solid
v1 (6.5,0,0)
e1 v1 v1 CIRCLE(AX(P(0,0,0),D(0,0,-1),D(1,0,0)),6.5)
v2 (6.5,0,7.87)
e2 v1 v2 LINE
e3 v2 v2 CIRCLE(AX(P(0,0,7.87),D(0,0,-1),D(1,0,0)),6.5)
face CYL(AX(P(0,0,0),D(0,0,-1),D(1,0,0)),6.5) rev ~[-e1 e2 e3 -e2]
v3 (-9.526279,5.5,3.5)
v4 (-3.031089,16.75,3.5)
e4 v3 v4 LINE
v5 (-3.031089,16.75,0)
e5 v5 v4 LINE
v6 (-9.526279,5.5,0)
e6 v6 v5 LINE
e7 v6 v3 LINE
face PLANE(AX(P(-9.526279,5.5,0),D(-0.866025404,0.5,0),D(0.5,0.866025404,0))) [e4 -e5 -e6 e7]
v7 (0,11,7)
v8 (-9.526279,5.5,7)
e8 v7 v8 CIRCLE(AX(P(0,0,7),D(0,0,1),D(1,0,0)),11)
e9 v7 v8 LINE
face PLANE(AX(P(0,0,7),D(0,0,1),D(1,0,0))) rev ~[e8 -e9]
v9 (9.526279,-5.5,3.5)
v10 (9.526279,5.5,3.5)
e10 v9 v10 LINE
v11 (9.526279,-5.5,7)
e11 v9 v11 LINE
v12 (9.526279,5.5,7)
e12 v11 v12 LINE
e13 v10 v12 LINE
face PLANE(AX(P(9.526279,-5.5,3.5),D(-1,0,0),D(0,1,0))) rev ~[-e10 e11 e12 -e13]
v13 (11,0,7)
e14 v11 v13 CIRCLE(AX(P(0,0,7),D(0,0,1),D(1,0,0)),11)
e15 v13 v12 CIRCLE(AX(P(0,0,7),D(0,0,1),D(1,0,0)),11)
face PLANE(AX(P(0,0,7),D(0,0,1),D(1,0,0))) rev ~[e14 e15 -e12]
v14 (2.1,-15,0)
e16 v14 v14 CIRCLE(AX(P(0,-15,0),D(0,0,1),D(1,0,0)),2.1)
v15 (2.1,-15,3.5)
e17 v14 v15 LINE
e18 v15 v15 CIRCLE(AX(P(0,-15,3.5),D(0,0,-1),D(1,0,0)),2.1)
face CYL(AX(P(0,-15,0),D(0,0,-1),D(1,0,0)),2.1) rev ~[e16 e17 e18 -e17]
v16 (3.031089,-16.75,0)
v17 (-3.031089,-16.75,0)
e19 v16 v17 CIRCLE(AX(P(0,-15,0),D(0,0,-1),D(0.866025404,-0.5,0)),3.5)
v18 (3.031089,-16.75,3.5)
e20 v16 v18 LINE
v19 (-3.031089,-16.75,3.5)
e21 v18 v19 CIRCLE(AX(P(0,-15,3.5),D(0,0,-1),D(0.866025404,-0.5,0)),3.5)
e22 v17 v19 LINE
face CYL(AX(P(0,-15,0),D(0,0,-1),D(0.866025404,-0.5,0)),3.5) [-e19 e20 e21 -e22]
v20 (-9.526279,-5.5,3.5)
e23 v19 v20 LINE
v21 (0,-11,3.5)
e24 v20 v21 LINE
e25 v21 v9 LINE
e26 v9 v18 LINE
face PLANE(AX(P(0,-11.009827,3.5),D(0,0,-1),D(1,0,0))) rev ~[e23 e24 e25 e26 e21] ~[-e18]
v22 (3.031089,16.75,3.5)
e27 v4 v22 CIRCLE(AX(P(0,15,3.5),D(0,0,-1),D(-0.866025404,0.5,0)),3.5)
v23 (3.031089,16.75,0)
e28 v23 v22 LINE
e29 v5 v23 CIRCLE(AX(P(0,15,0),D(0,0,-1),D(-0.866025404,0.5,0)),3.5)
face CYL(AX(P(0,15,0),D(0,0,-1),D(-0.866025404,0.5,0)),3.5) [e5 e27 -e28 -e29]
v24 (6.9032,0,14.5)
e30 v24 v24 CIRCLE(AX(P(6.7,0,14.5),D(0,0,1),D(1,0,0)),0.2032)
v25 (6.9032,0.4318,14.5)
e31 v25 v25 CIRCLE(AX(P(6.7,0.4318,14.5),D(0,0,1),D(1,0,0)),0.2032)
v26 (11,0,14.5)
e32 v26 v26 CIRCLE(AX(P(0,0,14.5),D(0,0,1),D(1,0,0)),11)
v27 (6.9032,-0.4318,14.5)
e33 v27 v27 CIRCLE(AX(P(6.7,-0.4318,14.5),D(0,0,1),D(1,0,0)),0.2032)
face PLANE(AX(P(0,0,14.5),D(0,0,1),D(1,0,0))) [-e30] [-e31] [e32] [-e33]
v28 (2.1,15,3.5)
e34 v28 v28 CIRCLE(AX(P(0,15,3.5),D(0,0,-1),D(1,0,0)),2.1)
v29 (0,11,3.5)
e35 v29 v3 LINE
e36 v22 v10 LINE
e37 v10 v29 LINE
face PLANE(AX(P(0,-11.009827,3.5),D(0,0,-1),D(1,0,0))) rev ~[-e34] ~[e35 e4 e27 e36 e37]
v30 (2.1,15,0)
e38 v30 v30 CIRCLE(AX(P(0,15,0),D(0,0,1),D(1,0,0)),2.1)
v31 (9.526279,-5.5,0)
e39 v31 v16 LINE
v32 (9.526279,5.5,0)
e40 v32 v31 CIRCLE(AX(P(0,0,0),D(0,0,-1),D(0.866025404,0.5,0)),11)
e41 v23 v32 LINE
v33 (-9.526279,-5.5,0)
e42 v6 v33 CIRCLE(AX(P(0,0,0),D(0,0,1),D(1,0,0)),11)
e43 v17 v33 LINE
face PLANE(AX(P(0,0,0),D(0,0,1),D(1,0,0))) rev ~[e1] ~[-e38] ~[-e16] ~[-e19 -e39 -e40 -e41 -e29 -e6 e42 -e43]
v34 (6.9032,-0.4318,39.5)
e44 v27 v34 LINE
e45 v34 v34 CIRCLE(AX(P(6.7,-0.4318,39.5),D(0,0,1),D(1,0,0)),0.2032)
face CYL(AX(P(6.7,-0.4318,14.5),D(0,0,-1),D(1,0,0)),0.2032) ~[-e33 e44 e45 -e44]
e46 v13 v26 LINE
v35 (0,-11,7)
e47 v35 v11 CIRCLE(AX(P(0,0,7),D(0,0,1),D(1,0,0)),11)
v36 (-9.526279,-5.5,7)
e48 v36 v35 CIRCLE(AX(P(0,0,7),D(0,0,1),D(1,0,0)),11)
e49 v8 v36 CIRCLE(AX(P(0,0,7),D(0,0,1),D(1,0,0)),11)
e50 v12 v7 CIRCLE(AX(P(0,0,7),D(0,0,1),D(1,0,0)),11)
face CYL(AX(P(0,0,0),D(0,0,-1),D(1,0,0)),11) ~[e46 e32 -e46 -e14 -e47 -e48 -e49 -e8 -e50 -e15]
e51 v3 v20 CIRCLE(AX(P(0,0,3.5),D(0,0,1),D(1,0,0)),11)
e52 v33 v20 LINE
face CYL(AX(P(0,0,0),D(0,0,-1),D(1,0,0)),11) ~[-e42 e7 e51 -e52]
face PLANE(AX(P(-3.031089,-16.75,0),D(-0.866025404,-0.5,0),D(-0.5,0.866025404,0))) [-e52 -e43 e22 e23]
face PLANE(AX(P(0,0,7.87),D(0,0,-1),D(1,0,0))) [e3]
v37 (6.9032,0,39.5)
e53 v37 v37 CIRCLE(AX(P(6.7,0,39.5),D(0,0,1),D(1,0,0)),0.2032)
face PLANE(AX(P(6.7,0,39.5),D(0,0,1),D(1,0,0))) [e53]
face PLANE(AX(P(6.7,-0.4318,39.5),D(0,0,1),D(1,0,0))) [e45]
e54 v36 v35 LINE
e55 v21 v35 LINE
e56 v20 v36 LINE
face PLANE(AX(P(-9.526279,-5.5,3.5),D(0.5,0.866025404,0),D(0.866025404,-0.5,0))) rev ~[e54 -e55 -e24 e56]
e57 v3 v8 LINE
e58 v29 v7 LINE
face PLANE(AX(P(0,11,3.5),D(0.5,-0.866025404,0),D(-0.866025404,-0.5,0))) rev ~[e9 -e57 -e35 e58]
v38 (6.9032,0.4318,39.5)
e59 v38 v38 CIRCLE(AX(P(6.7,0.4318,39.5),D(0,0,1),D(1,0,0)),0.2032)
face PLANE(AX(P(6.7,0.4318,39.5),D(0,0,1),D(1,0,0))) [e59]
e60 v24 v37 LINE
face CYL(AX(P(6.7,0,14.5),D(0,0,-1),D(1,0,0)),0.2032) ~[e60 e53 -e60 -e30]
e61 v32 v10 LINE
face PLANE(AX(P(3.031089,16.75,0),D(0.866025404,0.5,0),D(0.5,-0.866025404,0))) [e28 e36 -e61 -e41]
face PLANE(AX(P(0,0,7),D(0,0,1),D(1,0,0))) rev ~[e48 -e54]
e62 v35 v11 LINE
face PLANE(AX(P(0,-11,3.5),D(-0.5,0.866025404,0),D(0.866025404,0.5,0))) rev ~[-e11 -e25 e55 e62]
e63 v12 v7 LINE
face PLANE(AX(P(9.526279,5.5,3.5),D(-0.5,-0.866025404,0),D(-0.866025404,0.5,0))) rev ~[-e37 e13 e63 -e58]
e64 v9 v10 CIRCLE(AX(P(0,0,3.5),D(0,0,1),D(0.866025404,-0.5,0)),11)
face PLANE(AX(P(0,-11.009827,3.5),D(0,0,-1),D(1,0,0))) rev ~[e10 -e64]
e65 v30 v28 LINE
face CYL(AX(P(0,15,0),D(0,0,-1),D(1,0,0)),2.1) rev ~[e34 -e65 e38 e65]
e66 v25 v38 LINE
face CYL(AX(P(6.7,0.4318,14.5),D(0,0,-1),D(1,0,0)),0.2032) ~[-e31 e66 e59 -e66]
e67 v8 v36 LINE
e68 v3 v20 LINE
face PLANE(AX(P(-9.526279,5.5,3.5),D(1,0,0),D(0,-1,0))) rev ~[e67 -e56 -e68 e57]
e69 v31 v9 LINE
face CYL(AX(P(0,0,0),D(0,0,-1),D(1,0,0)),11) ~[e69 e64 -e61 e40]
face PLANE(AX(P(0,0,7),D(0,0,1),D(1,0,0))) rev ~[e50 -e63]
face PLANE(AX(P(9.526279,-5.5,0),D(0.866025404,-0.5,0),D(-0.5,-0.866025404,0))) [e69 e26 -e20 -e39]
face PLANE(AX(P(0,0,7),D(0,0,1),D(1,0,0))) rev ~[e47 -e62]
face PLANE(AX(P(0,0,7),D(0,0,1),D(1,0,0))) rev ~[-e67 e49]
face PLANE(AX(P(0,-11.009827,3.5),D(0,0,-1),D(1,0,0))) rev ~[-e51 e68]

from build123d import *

# Parameters (mm, degrees)
F0_R      = 11
F1_DEPTH  = 14.5
F2_R      = 2.1
F3_DEPTH  = 3.5
F4_R      = 11
F5_DEPTH  = 3.5
F7_DEPTH  = 3.5
F8_R      = 6.5
F9_DEPTH  = 7.87
F10_R     = 0.2032
F11_DEPTH = 25


# Not quite as in the source:
# - a pattern or mirror of a feature is missing from the dataset's text; its kind, count and spacing are read off the source's solid


with BuildPart() as f1:
    # F0 (on Top) → F1 (new body)
    with BuildSketch(Plane.XY):
        Circle(F0_R)
    extrude(amount=F1_DEPTH)

    # F2 (on face) → F3 (join)
    with BuildSketch(Plane(origin=(0, 0, 0), x_dir=(1, 0, 0), z_dir=(0, 0, -1))):
        with BuildLine():
            Line((9.5262794416, 5.5), (3.0310889132, 16.75))
            ThreePointArc((3.0310889132, 16.75), (0, 18.5), (-3.0310889132, 16.75))
            Line((-3.0310889132, 16.75), (-9.5262794416, 5.5))
            ThreePointArc((-9.5262794416, 5.5), (0, 11), (9.5262794416, 5.5))
        make_face()
        with Locations((0, 15)):
            Circle(F2_R, mode=Mode.SUBTRACT)
        with BuildLine():
            ThreePointArc((9.5262794416, -5.5), (0, -11), (-9.5262794416, -5.5))
            Line((-9.5262794416, -5.5), (-3.0310889132, -16.75))
            ThreePointArc((-3.0310889132, -16.75), (0, -18.5), (3.0310889132, -16.75))
            Line((3.0310889132, -16.75), (9.5262794416, -5.5))
        make_face()
        with Locations((0, -15)):
            Circle(F2_R, mode=Mode.SUBTRACT)
    f3 = extrude(amount=-F3_DEPTH)

    # F3_copies: F3 across plane
    add(f3.mirror(Plane(origin=(0, 0, 0), x_dir=(0, 0, -1), z_dir=(-1, 0, 0))))

    # F4 (on face) → F5 (cut)
    with BuildSketch(Plane.XY.offset(3.5)):
        Circle(F4_R)
    extrude(amount=F5_DEPTH, mode=Mode.SUBTRACT)

    # F6 (on face) → F7 (join)
    with BuildSketch(Plane.XY.offset(3.5)):
        Polygon((9.5262794416, 5.5), (0, 11), (-9.5262794416, 5.5), (-9.5262794416, -5.5), (0, -11), (9.5262794416, -5.5), align=None)
    extrude(amount=F7_DEPTH)

    # F8 (on face) → F9 (cut)
    with BuildSketch(Plane(origin=(0, 0, 0), x_dir=(1, 0, 0), z_dir=(0, 0, -1))):
        Circle(F8_R)
    extrude(amount=-F9_DEPTH, mode=Mode.SUBTRACT)

    # F10 (on face) → F11 (join)
    with BuildSketch(Plane.XY.offset(14.5)):
        with Locations((6.7, 0)):
            Circle(F10_R)
        with Locations((6.7, 0.4318)):
            Circle(F10_R)
        with Locations((6.7, -0.4318)):
            Circle(F10_R)
    extrude(amount=F11_DEPTH)


solid = f1.part
